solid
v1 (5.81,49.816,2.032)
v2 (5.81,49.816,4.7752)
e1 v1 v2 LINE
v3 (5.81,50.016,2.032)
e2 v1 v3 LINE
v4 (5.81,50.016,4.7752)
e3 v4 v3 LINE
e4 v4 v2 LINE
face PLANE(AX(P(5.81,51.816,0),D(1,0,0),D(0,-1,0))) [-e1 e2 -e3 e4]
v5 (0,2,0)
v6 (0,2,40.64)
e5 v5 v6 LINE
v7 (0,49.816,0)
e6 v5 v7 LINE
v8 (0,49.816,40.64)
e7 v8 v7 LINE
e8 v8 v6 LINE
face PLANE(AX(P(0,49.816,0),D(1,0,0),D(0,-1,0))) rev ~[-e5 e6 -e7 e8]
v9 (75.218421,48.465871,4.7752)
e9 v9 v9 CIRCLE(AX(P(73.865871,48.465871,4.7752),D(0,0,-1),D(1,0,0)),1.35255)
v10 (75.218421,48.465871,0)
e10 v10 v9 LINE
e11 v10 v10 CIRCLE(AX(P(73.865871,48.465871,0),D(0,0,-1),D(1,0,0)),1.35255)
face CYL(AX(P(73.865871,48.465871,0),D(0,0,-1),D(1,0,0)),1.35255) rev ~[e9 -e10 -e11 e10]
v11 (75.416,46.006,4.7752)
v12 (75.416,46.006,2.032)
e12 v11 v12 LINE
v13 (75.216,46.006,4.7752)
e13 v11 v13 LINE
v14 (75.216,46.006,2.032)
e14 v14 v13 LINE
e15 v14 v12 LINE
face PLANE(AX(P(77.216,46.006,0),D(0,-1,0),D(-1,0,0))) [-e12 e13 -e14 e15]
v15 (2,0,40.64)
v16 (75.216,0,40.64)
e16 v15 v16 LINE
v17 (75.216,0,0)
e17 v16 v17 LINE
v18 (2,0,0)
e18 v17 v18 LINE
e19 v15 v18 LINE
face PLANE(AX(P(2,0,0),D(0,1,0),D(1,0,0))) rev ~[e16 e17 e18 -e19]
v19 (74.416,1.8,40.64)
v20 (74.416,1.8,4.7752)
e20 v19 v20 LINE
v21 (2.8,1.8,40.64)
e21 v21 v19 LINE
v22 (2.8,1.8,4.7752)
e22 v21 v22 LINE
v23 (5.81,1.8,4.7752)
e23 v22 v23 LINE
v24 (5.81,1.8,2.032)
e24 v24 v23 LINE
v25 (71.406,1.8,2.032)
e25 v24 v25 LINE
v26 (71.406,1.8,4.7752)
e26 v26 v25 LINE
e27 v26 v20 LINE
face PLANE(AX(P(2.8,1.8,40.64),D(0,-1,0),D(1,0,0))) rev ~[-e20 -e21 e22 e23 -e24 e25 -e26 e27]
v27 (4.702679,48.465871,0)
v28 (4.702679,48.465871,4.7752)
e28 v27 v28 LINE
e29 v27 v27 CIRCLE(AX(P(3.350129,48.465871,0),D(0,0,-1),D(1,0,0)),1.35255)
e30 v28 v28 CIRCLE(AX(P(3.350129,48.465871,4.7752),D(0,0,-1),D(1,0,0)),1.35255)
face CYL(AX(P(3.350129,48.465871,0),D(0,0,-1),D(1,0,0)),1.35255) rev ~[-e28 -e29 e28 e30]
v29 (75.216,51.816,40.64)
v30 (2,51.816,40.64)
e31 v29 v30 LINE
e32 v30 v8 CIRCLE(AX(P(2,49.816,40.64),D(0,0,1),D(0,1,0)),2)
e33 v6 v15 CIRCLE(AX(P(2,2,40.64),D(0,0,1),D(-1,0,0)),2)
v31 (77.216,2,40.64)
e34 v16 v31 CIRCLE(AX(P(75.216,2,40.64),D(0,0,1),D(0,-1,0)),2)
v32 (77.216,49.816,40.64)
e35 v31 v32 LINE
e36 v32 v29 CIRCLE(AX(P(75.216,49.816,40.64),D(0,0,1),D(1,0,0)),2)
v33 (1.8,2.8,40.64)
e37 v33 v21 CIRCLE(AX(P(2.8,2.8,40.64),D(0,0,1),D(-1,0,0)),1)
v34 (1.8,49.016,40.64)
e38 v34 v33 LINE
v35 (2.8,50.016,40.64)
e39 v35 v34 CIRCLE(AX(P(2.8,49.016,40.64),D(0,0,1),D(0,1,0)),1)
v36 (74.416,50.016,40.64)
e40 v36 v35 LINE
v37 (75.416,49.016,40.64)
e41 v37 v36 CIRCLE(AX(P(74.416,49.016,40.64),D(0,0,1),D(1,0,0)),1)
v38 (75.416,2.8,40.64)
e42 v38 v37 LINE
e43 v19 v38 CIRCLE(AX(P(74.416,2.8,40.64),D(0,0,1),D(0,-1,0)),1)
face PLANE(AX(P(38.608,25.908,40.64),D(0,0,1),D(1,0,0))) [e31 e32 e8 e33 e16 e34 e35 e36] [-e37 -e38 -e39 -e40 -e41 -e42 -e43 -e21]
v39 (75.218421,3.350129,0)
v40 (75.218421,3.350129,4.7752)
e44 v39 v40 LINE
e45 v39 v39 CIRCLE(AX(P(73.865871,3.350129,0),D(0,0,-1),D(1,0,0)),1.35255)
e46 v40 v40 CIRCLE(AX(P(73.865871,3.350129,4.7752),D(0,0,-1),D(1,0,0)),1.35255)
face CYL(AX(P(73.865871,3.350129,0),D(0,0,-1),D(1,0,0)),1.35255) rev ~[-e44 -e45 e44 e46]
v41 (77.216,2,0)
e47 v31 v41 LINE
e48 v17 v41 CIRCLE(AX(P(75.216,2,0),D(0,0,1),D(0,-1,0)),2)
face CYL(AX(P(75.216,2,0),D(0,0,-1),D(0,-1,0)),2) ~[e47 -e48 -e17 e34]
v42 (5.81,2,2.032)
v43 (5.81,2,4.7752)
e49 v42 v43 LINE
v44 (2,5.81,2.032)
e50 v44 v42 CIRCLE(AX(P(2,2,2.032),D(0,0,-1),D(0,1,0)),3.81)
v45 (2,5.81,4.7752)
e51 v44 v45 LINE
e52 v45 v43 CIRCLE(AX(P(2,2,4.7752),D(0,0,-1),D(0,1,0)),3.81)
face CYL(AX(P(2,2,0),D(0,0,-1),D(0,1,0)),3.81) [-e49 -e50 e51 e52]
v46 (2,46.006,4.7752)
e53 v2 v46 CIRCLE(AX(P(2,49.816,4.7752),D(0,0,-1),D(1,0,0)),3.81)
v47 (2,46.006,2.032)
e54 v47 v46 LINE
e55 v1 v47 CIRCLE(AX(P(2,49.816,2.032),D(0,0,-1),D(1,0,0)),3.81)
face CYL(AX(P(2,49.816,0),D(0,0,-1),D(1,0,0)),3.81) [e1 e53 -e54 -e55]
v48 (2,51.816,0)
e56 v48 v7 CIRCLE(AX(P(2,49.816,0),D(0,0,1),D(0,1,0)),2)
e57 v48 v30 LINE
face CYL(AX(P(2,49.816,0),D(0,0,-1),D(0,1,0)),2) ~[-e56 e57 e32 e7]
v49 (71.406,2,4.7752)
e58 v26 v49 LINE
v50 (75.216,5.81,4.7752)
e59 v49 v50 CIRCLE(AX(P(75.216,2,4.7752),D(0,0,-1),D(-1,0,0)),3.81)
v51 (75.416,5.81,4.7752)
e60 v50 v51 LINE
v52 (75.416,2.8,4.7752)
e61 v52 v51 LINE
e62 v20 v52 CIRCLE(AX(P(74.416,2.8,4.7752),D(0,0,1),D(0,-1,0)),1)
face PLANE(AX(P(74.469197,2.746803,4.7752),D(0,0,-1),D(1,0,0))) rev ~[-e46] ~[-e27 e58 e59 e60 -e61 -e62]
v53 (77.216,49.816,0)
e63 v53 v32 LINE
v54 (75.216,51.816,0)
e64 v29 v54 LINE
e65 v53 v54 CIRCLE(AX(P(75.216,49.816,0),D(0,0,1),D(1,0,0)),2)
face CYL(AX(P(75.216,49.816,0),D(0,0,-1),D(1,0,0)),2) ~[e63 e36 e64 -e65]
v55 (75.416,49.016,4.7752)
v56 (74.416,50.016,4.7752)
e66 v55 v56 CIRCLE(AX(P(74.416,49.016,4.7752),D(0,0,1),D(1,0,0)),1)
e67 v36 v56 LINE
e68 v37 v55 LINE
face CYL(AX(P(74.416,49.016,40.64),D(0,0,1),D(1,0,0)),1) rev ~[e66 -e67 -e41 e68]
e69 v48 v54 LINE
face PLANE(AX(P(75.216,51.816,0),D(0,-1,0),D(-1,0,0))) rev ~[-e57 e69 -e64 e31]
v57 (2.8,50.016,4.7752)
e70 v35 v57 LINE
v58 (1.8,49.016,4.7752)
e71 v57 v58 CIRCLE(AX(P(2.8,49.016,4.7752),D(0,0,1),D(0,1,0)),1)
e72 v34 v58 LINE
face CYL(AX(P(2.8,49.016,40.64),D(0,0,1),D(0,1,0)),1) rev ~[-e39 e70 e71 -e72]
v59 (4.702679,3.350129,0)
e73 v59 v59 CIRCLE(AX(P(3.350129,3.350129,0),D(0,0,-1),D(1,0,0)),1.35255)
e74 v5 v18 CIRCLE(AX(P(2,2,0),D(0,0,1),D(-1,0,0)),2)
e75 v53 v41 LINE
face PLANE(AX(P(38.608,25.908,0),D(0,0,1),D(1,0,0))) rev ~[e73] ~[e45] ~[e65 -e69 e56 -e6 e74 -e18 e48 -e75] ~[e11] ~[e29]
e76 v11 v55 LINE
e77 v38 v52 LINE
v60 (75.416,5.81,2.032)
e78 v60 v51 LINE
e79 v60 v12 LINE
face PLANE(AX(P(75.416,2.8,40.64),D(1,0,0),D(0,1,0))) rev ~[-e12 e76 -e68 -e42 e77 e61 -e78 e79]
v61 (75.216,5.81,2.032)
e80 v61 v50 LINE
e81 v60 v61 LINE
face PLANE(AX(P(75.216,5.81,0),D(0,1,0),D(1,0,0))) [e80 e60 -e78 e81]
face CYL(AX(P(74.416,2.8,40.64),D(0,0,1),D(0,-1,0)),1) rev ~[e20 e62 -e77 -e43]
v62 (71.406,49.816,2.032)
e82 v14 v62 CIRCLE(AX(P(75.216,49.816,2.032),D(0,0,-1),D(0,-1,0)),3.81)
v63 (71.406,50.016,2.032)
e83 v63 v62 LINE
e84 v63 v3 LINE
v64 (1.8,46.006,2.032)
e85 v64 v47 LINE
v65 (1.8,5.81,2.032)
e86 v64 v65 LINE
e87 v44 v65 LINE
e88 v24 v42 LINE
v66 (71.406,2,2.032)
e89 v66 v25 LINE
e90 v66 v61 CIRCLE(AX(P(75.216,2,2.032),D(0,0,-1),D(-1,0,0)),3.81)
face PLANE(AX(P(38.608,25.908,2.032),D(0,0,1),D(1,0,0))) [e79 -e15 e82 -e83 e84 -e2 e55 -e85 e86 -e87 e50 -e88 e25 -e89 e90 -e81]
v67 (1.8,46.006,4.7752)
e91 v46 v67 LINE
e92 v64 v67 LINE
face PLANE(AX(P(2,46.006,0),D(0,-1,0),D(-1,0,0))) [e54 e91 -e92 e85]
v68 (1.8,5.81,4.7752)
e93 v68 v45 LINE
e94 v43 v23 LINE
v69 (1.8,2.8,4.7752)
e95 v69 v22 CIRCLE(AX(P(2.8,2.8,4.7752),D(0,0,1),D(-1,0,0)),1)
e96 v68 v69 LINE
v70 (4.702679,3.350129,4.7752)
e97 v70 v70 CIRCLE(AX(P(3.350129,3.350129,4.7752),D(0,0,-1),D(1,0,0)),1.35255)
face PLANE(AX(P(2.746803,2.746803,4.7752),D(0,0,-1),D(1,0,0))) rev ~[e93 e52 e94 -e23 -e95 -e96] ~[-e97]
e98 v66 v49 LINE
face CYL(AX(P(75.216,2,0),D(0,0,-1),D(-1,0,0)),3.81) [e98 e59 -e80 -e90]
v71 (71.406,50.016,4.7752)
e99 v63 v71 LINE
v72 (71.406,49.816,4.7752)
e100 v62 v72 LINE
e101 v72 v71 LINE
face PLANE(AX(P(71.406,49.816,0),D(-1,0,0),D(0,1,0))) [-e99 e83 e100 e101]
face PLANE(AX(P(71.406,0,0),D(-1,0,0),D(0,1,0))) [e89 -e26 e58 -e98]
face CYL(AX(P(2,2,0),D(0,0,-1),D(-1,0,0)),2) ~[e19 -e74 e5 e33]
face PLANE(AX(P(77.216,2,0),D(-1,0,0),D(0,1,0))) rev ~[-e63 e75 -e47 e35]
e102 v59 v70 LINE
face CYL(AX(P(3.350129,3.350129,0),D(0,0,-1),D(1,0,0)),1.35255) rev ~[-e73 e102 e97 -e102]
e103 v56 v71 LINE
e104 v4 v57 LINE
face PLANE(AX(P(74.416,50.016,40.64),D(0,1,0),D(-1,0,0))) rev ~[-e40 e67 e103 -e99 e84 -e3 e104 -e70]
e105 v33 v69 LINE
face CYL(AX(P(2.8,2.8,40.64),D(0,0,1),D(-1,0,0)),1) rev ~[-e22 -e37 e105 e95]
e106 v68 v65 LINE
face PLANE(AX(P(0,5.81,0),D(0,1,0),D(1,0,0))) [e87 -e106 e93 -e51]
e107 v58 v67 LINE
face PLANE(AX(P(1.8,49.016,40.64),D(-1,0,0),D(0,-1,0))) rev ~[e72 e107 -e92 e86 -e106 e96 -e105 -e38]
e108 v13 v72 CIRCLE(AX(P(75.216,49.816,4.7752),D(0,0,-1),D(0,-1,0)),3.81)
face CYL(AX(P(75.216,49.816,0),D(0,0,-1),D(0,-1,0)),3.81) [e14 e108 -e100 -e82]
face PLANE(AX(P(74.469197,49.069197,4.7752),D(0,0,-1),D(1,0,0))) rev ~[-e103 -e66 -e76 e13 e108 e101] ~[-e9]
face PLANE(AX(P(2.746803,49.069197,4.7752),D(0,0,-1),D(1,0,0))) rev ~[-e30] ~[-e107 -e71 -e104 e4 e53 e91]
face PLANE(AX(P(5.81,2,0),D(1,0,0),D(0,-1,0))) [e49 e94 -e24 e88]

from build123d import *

# Parameters (mm, degrees)
F1_DEPTH = 40.64
F3_DEPTH = 38.608
F5_DEPTH = 4.7752
F6_R     = 1.35255
F7_DEPTH = 4.7752


# Not quite as in the source:
# - a feature names something its author has since deleted; it is built from what else it names


with BuildPart() as f1:
    # F0 (on Top) → F1 (new body)
    with BuildSketch(Plane.XY):
        with BuildLine():
            ThreePointArc((0, 2), (0.5857864376, 0.5857864376), (2, 0))
            Line((2, 0), (75.216, 0))
            ThreePointArc((75.216, 0), (76.6302135624, 0.5857864376), (77.216, 2))
            Line((77.216, 2), (77.216, 49.816))
            ThreePointArc((77.216, 49.816), (76.6302135624, 51.2302135624), (75.216, 51.816))
            Line((75.216, 51.816), (2, 51.816))
            ThreePointArc((2, 51.816), (0.5857864376, 51.2302135624), (0, 49.816))
            Line((0, 49.816), (0, 2))
        make_face()
    extrude(amount=F1_DEPTH)

    # F2 (on face) → F3 (cut)
    with BuildSketch(Plane.XY.offset(40.64)):
        with BuildLine():
            Line((74.416, 50.016), (2.8, 50.016))
            ThreePointArc((2.8, 50.016), (2.0928932188, 49.7231067812), (1.8, 49.016))
            Line((1.8, 49.016), (1.8, 2.8))
            ThreePointArc((1.8, 2.8), (2.0928932188, 2.0928932188), (2.8, 1.8))
            Line((2.8, 1.8), (74.416, 1.8))
            ThreePointArc((74.416, 1.8), (75.1231067812, 2.0928932188), (75.416, 2.8))
            Line((75.416, 2.8), (75.416, 49.016))
            ThreePointArc((75.416, 49.016), (75.1231067812, 49.7231067812), (74.416, 50.016))
        make_face()
    extrude(amount=-F3_DEPTH, mode=Mode.SUBTRACT)

    # F4 (on face) → F5 (join)
    with BuildSketch(Plane(origin=(0, 0, 0), x_dir=(1, 0, 0), z_dir=(0, 0, -1))):
        with BuildLine():
            ThreePointArc((77.216, -2), (76.6302135624, -0.5857864376), (75.216, 0))
            Line((75.216, 0), (71.406, 0))
            Line((71.406, 0), (71.406, -2))
            ThreePointArc((71.406, -2), (72.5219231637, -4.6940768363), (75.216, -5.81))
            Line((75.216, -5.81), (77.216, -5.81))
            Line((77.216, -5.81), (77.216, -2))
        make_face()
        with BuildLine():
            Line((71.406, -49.816), (71.406, -51.816))
            Line((71.406, -51.816), (75.216, -51.816))
            ThreePointArc((75.216, -51.816), (76.6302135624, -51.2302135624), (77.216, -49.816))
            Line((77.216, -49.816), (77.216, -46.006))
            Line((77.216, -46.006), (75.216, -46.006))
            ThreePointArc((75.216, -46.006), (72.5219231637, -47.1219231637), (71.406, -49.816))
        make_face()
        with BuildLine():
            ThreePointArc((5.81, -49.816), (4.6940768363, -47.1219231637), (2, -46.006))
            Line((2, -46.006), (0, -46.006))
            Line((0, -46.006), (0, -49.816))
            ThreePointArc((0, -49.816), (0.5857864376, -51.2302135624), (2, -51.816))
            Line((2, -51.816), (5.81, -51.816))
            Line((5.81, -51.816), (5.81, -49.816))
        make_face()
        with BuildLine():
            Line((5.81, 0), (2, 0))
            ThreePointArc((2, 0), (0.5857864376, -0.5857864376), (0, -2))
            Line((0, -2), (0, -5.81))
            Line((0, -5.81), (2, -5.81))
            ThreePointArc((2, -5.81), (4.6940768363, -4.6940768363), (5.81, -2))
            Line((5.81, -2), (5.81, 0))
        make_face()
    extrude(amount=-F5_DEPTH)

    # F6 (on face) → F7 (cut, through all)
    with BuildSketch(Plane(origin=(0, 0, 0), x_dir=(1, 0, 0), z_dir=(0, 0, -1))):
        with Locations((73.8658709242, -3.3501290758)):
            Circle(F6_R)
        with Locations((3.3501290758, -3.3501290758)):
            Circle(F6_R)
        with Locations((3.3501290758, -48.4658709242)):
            Circle(F6_R)
        with Locations((73.8658709242, -48.4658709242)):
            Circle(F6_R)
    extrude(amount=-F7_DEPTH, mode=Mode.SUBTRACT)


solid = f1.part
